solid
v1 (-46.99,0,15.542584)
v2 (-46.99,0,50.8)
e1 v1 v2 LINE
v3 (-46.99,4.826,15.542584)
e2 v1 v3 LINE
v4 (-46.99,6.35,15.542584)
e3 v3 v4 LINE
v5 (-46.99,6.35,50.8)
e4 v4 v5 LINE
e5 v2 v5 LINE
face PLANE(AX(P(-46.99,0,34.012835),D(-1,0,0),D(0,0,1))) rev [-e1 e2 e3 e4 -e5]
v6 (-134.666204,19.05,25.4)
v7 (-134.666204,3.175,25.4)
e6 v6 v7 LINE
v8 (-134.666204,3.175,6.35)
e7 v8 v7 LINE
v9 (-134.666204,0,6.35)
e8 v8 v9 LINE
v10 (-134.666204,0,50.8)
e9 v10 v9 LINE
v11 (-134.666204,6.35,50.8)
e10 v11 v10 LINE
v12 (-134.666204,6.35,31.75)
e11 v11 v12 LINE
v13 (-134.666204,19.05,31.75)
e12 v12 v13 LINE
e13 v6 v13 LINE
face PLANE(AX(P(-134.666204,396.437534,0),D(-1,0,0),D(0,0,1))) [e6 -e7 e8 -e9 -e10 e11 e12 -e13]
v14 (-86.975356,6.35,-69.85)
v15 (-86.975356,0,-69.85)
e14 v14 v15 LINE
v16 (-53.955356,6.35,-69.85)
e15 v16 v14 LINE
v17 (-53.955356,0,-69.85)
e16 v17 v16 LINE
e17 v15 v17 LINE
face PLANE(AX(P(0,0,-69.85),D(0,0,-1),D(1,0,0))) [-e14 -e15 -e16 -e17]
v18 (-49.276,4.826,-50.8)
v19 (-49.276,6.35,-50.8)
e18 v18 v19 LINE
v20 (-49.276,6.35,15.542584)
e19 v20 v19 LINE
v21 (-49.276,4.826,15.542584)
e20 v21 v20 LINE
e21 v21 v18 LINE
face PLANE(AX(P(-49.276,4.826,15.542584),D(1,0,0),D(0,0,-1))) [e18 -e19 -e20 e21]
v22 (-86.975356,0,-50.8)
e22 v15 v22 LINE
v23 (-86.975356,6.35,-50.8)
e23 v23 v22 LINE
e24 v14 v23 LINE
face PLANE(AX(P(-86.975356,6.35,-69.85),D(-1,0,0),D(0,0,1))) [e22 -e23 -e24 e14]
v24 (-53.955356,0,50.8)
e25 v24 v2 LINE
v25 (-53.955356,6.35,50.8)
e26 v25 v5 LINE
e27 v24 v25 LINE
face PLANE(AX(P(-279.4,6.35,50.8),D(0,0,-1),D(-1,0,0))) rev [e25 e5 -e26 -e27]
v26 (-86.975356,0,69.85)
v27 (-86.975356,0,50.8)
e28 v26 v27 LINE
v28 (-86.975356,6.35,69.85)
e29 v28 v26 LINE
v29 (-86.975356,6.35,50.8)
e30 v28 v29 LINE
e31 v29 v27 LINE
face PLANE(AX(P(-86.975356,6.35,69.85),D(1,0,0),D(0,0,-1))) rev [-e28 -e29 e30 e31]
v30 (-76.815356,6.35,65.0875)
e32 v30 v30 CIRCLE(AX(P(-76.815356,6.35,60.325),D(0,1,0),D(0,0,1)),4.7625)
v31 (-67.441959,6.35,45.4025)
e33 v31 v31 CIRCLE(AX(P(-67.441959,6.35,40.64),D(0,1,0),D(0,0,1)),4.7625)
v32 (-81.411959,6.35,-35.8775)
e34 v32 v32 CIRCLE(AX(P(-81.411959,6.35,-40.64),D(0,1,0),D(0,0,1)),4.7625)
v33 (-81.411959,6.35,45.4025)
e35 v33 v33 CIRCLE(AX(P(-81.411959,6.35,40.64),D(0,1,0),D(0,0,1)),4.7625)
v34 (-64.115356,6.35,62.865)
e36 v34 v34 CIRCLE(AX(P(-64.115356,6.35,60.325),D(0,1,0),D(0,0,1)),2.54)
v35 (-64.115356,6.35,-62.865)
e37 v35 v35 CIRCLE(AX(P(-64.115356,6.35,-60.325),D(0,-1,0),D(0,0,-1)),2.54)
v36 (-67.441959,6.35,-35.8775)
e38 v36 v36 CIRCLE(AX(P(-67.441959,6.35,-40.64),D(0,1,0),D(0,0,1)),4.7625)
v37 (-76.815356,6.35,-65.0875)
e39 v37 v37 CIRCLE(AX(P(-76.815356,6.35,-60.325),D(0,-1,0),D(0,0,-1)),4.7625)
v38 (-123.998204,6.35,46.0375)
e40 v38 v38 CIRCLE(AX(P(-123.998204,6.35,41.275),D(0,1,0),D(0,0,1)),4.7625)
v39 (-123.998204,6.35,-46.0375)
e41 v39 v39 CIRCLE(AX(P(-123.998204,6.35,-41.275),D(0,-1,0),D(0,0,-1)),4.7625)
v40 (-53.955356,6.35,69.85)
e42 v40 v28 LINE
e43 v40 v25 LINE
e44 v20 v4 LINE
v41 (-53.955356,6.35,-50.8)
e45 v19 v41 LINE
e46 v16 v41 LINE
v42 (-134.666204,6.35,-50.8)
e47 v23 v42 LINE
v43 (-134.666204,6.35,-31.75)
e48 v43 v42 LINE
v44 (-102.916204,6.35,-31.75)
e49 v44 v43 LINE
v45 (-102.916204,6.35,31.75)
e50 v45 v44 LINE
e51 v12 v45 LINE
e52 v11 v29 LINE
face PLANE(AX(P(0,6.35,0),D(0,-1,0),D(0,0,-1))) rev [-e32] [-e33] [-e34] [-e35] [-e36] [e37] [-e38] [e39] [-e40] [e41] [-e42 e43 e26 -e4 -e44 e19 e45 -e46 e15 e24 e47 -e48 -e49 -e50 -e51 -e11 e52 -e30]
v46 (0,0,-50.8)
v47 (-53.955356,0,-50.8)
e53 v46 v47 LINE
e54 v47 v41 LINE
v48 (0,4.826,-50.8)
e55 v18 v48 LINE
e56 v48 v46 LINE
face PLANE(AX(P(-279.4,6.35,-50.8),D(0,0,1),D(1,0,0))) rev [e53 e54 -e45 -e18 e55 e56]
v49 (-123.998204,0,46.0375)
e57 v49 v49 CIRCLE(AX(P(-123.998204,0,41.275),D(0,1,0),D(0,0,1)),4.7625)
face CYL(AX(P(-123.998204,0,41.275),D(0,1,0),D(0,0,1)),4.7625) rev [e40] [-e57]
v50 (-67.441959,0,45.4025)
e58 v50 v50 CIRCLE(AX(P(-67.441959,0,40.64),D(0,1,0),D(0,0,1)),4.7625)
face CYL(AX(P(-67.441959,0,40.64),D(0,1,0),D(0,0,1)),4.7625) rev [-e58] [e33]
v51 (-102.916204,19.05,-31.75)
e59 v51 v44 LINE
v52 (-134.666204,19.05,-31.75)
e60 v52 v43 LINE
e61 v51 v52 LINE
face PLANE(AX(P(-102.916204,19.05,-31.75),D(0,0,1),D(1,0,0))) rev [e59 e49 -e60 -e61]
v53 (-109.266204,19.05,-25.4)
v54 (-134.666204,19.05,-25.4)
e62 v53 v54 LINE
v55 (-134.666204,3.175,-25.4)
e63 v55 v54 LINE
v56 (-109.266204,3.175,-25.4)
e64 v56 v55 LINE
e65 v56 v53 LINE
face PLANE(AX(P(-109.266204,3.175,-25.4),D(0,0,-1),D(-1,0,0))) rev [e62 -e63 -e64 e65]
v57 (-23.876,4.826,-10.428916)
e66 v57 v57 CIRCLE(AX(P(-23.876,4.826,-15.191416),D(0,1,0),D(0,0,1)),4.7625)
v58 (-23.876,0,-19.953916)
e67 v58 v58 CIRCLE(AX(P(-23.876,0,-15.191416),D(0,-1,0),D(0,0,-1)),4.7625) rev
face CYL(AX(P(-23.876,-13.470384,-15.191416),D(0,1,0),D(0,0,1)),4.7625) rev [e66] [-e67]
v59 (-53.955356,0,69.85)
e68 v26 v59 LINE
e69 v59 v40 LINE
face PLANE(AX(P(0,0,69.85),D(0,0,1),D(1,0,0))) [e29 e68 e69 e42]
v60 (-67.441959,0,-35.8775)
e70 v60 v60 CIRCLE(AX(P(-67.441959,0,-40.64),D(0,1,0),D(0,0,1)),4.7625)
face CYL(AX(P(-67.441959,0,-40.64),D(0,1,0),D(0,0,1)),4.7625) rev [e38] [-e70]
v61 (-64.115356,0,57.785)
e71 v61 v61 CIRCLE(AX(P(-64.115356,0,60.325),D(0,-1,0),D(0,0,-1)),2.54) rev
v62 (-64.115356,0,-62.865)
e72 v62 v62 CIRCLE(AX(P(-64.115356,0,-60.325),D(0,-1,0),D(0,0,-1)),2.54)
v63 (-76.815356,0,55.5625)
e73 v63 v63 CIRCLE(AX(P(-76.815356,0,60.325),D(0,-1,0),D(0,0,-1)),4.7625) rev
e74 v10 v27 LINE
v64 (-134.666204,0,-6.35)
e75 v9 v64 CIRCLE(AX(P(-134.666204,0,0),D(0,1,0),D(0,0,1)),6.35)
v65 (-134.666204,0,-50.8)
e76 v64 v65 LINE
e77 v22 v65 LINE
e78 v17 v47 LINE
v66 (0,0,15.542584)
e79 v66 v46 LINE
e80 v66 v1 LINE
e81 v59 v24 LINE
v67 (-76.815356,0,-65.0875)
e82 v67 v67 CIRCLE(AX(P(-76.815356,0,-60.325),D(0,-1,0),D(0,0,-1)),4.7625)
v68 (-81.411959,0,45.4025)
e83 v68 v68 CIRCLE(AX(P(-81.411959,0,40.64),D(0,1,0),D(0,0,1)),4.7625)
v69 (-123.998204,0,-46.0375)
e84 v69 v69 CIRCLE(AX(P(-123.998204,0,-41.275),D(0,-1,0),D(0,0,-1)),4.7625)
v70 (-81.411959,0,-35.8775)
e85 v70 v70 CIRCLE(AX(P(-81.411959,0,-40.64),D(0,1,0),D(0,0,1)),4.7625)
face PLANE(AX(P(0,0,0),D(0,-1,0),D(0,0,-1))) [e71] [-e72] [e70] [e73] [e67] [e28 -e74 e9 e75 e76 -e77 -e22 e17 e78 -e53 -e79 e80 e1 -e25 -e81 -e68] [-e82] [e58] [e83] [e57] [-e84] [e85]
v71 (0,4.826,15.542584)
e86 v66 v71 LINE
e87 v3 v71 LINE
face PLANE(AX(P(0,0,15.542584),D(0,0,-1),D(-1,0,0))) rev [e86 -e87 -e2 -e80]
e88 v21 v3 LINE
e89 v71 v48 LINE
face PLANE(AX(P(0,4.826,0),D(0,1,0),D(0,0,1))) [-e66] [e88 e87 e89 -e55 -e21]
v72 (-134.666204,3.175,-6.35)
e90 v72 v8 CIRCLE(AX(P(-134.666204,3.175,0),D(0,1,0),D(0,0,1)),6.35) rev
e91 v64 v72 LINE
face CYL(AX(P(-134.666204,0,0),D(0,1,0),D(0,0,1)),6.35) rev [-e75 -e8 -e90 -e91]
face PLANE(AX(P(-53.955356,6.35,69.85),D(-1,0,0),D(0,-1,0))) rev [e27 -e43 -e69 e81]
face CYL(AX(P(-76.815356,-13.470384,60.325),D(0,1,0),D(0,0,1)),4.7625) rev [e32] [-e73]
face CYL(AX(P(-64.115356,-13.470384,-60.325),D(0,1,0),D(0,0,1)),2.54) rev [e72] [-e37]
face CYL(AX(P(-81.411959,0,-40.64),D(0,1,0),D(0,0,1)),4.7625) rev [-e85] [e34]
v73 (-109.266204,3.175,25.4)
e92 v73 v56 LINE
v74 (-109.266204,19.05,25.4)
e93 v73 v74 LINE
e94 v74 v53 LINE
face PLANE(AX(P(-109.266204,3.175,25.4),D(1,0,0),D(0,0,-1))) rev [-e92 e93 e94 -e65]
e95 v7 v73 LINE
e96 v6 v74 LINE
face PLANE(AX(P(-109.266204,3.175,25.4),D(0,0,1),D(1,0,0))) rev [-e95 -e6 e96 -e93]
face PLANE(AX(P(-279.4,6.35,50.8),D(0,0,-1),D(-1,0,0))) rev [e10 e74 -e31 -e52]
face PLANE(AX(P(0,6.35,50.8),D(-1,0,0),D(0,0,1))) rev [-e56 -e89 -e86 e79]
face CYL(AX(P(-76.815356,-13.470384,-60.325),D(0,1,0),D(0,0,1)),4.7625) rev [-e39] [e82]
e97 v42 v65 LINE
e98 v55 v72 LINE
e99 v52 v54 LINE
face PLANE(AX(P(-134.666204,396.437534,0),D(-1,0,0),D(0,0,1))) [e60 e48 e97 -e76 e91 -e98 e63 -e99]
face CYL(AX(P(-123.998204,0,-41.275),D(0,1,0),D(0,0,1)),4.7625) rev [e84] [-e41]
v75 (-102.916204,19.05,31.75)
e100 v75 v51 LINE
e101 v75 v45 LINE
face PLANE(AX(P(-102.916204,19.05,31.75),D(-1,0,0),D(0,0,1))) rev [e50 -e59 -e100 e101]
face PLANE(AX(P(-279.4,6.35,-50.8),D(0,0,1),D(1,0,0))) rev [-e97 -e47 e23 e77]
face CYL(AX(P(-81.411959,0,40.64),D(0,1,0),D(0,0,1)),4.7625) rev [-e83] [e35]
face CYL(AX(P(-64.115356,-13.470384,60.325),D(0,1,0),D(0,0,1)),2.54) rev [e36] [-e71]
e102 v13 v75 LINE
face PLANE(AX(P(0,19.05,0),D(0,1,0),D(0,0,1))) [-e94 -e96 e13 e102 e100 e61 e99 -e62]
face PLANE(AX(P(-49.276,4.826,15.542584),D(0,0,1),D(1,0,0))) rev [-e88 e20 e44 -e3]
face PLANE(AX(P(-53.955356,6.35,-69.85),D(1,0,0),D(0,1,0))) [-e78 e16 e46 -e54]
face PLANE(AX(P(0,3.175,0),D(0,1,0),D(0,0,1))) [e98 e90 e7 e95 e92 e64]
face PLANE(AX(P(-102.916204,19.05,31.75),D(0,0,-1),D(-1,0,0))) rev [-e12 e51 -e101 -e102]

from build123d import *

# Parameters (mm, degrees)
SKETCH1_W                 = 279.4
SKETCH1_H                 = 101.6
BOSS_EXTRUDE1_DEPTH       = 6.35
SKETCH2_R                 = 13.97
BOSS_EXTRUDE3_DEPTH       = 5.55625
SKETCH9_R                 = 11.1125
CUT_EXTRUDE4_DEPTH        = 4.445
CUT_EXTRUDE5_START        = -5.55625
SKETCH10_R                = 11.1125
CUT_EXTRUDE5_DEPTH        = 5.55625
SKETCH11_R                = 7.9375
CUT_EXTRUDE6_DEPTH        = 285.078633923
SKETCH12_R                = 6.35
CUT_EXTRUDE7_DEPTH        = 285.051619429
SKETCH22_W                = 63.5
SKETCH22_H                = 63.5
BOSS_EXTRUDE7_DEPTH       = 12.7
SKETCH25_W                = 50.8
SKETCH25_H                = 50.8
CUT_EXTRUDE11_DEPTH       = 15.875
SKETCH32_R                = 4.7625
CUT_EXTRUDE12_DEPTH       = 6.35
SKETCH38_W                = 46.99
SKETCH38_H                = 18.470251096
CUT_EXTRUDE13_DEPTH       = 6.35
SKETCH60_R                = 4.7625
CUT_EXTRUDE23_DEPTH       = 6.35
SKETCH64_R                = 4.7625
CUT_EXTRUDE24_DEPTH       = 285.264471927
SKETCH69_W                = 33.02
SKETCH69_H                = 6.35
BOSS_EXTRUDE10_DEPTH      = 19.05
SKETCH70_R                = 4.7625
SKETCH70_R_2              = 2.54
CUT_EXTRUDE26_DEPTH       = 6.35
SKETCH76_R                = 4.7625
CUT_EXTRUDE29_DEPTH       = 6.35
SKETCH77_W                = 46.99
SKETCH77_H                = 16.7871648
CUT_EXTRUDE30_DEPTH       = 6.35
SKETCH78_W                = 49.276
SKETCH78_H                = 66.342584104
CUT_EXTRUDE32_DEPTH       = 1.524
SKETCH79_R                = 4.7625
CUT_EXTRUDE33_DEPTH       = 4.826
CUT_EXTRUDE34_START       = -3.175
CUT_EXTRUDE34_OUTLINE_R   = 4.7625
CUT_EXTRUDE34_OUTLINE_R_2 = 7.9375
CUT_EXTRUDE34_DEPTH       = 19.05


# Read off the part's stored shape, not the designer's step: Cut-Extrude34
with BuildPart() as part:
    # Sketch1 → Boss-Extrude1 (new body)
    with BuildSketch(Plane(origin=(0, 0, 0), x_dir=(1, 0, 0), z_dir=(0, 1, 0))):
        with Locations((-139.7, 0)):
            Rectangle(SKETCH1_W, SKETCH1_H)
    extrude(amount=BOSS_EXTRUDE1_DEPTH)

    # Sketch2 → Boss-Extrude3 (add)
    with BuildSketch(Plane(origin=(0, 6.35, 0), x_dir=(1, 0, 0), z_dir=(0, 1, 0))):
        with Locations(Location((-258.510557857, 0, 0), (0, 0, 90))):
            Circle(SKETCH2_R)
    extrude(amount=BOSS_EXTRUDE3_DEPTH)

    # Sketch9 → Cut-Extrude4 (cut)
    with BuildSketch(Plane(origin=(0, 11.90625, 0), x_dir=(1, 0, 0), z_dir=(0, 1, 0))):
        with Locations(Location((-258.510557857, 0, 0), (0, 0, 270))):
            Circle(SKETCH9_R)
    extrude(amount=-CUT_EXTRUDE4_DEPTH, mode=Mode.SUBTRACT)

    # Sketch10 → Cut-Extrude5 (cut)
    with BuildSketch(Plane(origin=(0, 0, 0), x_dir=(-1, 0, 0), z_dir=(0, -1, 0)).offset(CUT_EXTRUDE5_START)):
        with Locations(Location((258.510557857, 0, 0), (0, 0, 270))):
            Circle(SKETCH10_R)
    extrude(amount=CUT_EXTRUDE5_DEPTH, mode=Mode.SUBTRACT)

    # Sketch11 → Cut-Extrude6 (cut, through all)
    with BuildSketch(Plane(origin=(0, 7.46125, 0), x_dir=(1, 0, 0), z_dir=(0, 1, 0))):
        with Locations(Location((-258.510557857, 0, 0), (0, 0, 270))):
            Circle(SKETCH11_R)
    extrude(amount=-CUT_EXTRUDE6_DEPTH, mode=Mode.SUBTRACT)

    # Sketch12 → Cut-Extrude7 (cut, through all)
    with BuildSketch(Plane(origin=(0, 6.35, 0), x_dir=(1, 0, 0), z_dir=(0, 1, 0))):
        with Locations(Location((-134.666203771, 0, 0), (0, 0, 270))):
            Circle(SKETCH12_R)
    extrude(amount=-CUT_EXTRUDE7_DEPTH, mode=Mode.SUBTRACT)

    # Sketch22 → Boss-Extrude7 (add)
    with BuildSketch(Plane(origin=(0, 6.35, 0), x_dir=(1, 0, 0), z_dir=(0, 1, 0))):
        with Locations((-134.666203771, 0)):
            Rectangle(SKETCH22_W, SKETCH22_H)
    extrude(amount=BOSS_EXTRUDE7_DEPTH)

    # Sketch25 → Cut-Extrude11 (cut)
    with BuildSketch(Plane(origin=(0, 19.05, 0), x_dir=(1, 0, 0), z_dir=(0, 1, 0))):
        with Locations((-134.666203771, 0)):
            Rectangle(SKETCH25_W, SKETCH25_H)
    extrude(amount=-CUT_EXTRUDE11_DEPTH, mode=Mode.SUBTRACT)

    # Sketch32 → Cut-Extrude12 (cut)
    with BuildSketch(Plane(origin=(0, 6.35, 0), x_dir=(1, 0, 0), z_dir=(0, 1, 0))):
        with Locations(Location((-67.44195898, -40.64, 0), (0, 0, 270))):
            Circle(SKETCH32_R)
        with Locations(Location((-81.41195898, -40.64, 0), (0, 0, 270))):
            Circle(SKETCH32_R)
        with Locations(Location((-67.44195898, 40.64, 0), (0, 0, 270))):
            Circle(SKETCH32_R)
        with Locations(Location((-81.41195898, 40.64, 0), (0, 0, 270))):
            Circle(SKETCH32_R)
    extrude(amount=-CUT_EXTRUDE12_DEPTH, mode=Mode.SUBTRACT)

    # Sketch38 → Cut-Extrude13 (cut)
    with BuildSketch(Plane(origin=(0, 6.35, 0), x_dir=(1, 0, 0), z_dir=(0, 1, 0))):
        with Locations((-23.495, -24.777709652)):
            Rectangle(SKETCH38_W, SKETCH38_H)
    extrude(amount=-CUT_EXTRUDE13_DEPTH, mode=Mode.SUBTRACT)

    # Sketch60 → Cut-Extrude23 (cut)
    with BuildSketch(Plane(origin=(0, 6.35, 0), x_dir=(1, 0, 0), z_dir=(0, 1, 0))):
        with Locations(Location((-231.7492444, 41.324145444, 0), (0, 0, 270))):
            Circle(SKETCH60_R)
        with Locations(Location((-231.7492444, -39.369341378, 0), (0, 0, 270))):
            Circle(SKETCH60_R)
        with Locations(Location((-173.509244294, -39.369341378, 0), (0, 0, 270))):
            Circle(SKETCH60_R)
        with Locations(Location((-173.509244294, 41.324145444, 0), (0, 0, 270))):
            Circle(SKETCH60_R)
    extrude(amount=-CUT_EXTRUDE23_DEPTH, mode=Mode.SUBTRACT)

    # Sketch64 → Cut-Extrude24 (cut, through all)
    with BuildSketch(Plane(origin=(0, 6.35, 0), x_dir=(1, 0, 0), z_dir=(0, 1, 0))):
        with Locations(Location((-145.334203771, -41.275, 0), (0, 0, 270))):
            Circle(SKETCH64_R)
        with Locations(Location((-123.998203771, -41.275, 0), (0, 0, 270))):
            Circle(SKETCH64_R)
    cut_extrude24 = extrude(amount=-CUT_EXTRUDE24_DEPTH, mode=Mode.SUBTRACT)

    # Mirror1: Cut-Extrude24 across plane
    add(cut_extrude24.mirror(Plane.XY), mode=Mode.SUBTRACT)

    # Sketch69 → Boss-Extrude10 (add)
    with BuildSketch(Plane.XY.offset(50.8)):
        with Locations((-70.465355554, 3.175)):
            Rectangle(SKETCH69_W, SKETCH69_H)
    boss_extrude10 = extrude(amount=BOSS_EXTRUDE10_DEPTH)

    # Sketch70 → Cut-Extrude26 (cut)
    with BuildSketch(Plane(origin=(0, 6.35, 0), x_dir=(1, 0, 0), z_dir=(0, 1, 0))):
        with Locations(Location((-76.815355554, -60.325, 0), (0, 0, 270))):
            Circle(SKETCH70_R)
        with Locations(Location((-64.115355554, -60.325, 0), (0, 0, 270))):
            Circle(SKETCH70_R_2)
    cut_extrude26 = extrude(amount=-CUT_EXTRUDE26_DEPTH, mode=Mode.SUBTRACT)

    # Mirror2: Boss-Extrude10, Cut-Extrude26 across plane
    add(boss_extrude10.mirror(Plane.XY))
    add(cut_extrude26.mirror(Plane.XY), mode=Mode.SUBTRACT)

    # Sketch76 → Cut-Extrude29 (cut)
    with BuildSketch(Plane(origin=(0, 6.35, 0), x_dir=(1, 0, 0), z_dir=(0, 1, 0))):
        with Locations(Location((-264.668, 24.13, 0), (0, 0, 270))):
            Circle(SKETCH76_R)
        with Locations(Location((-252.222, 24.13, 0), (0, 0, 270))):
            Circle(SKETCH76_R)
    extrude(amount=-CUT_EXTRUDE29_DEPTH, mode=Mode.SUBTRACT)

    # Sketch77 → Cut-Extrude30 (cut)
    with BuildSketch(Plane(origin=(0, 6.35, 0), x_dir=(1, 0, 0), z_dir=(0, 1, 0))):
        with Locations((-23.495, -42.4064176)):
            Rectangle(SKETCH77_W, SKETCH77_H)
    extrude(amount=-CUT_EXTRUDE30_DEPTH, mode=Mode.SUBTRACT)

    # Sketch78 → Cut-Extrude32 (cut)
    with BuildSketch(Plane(origin=(0, 6.35, 0), x_dir=(1, 0, 0), z_dir=(0, 1, 0))):
        with Locations((-24.638, 17.628707948)):
            Rectangle(SKETCH78_W, SKETCH78_H)
    extrude(amount=-CUT_EXTRUDE32_DEPTH, mode=Mode.SUBTRACT)

    # Sketch79 → Cut-Extrude33 (cut)
    with BuildSketch(Plane(origin=(0, 4.826, 0), x_dir=(1, 0, 0), z_dir=(0, 1, 0))):
        with Locations(Location((-23.876, 15.191415896, 0), (0, 0, 270))):
            Circle(SKETCH79_R)
    extrude(amount=-CUT_EXTRUDE33_DEPTH, mode=Mode.SUBTRACT)

    # Cut-Extrude34 outline → Cut-Extrude34 (cut)
    with BuildSketch(Plane(origin=(0, 3.175, 0), x_dir=(1, 0, 0), z_dir=(0, 1, 0)).offset(CUT_EXTRUDE34_START)):
        with BuildLine():
            ThreePointArc((-134.666203771, -6.35), (-141.016203771, 0), (-134.666203771, 6.35))
            Line((-134.666203771, 6.35), (-134.666203771, 50.8))
            Line((-134.666203771, 50.8), (-279.4, 50.8))
            Line((-279.4, 50.8), (-279.4, -50.8))
            Line((-279.4, -50.8), (-134.666203771, -50.8))
            Line((-134.666203771, -50.8), (-134.666203771, -6.35))
        make_face()
        with Locations((-231.7492444, 41.324145444)):
            Circle(CUT_EXTRUDE34_OUTLINE_R, mode=Mode.SUBTRACT)
        with Locations((-173.509244294, 41.324145444)):
            Circle(CUT_EXTRUDE34_OUTLINE_R, mode=Mode.SUBTRACT)
        with Locations((-145.334203771, 41.275)):
            Circle(CUT_EXTRUDE34_OUTLINE_R, mode=Mode.SUBTRACT)
        with Locations((-231.7492444, -39.369341378)):
            Circle(CUT_EXTRUDE34_OUTLINE_R, mode=Mode.SUBTRACT)
        with Locations((-173.509244294, -39.369341378)):
            Circle(CUT_EXTRUDE34_OUTLINE_R, mode=Mode.SUBTRACT)
        with Locations((-145.334203771, -41.275)):
            Circle(CUT_EXTRUDE34_OUTLINE_R, mode=Mode.SUBTRACT)
        with Locations((-264.668, 24.13)):
            Circle(CUT_EXTRUDE34_OUTLINE_R, mode=Mode.SUBTRACT)
        with Locations((-252.222, 24.13)):
            Circle(CUT_EXTRUDE34_OUTLINE_R, mode=Mode.SUBTRACT)
        with Locations((-258.510557857, 0)):
            Circle(CUT_EXTRUDE34_OUTLINE_R_2, mode=Mode.SUBTRACT)
    extrude(amount=CUT_EXTRUDE34_DEPTH, mode=Mode.SUBTRACT)


solid = part.part
